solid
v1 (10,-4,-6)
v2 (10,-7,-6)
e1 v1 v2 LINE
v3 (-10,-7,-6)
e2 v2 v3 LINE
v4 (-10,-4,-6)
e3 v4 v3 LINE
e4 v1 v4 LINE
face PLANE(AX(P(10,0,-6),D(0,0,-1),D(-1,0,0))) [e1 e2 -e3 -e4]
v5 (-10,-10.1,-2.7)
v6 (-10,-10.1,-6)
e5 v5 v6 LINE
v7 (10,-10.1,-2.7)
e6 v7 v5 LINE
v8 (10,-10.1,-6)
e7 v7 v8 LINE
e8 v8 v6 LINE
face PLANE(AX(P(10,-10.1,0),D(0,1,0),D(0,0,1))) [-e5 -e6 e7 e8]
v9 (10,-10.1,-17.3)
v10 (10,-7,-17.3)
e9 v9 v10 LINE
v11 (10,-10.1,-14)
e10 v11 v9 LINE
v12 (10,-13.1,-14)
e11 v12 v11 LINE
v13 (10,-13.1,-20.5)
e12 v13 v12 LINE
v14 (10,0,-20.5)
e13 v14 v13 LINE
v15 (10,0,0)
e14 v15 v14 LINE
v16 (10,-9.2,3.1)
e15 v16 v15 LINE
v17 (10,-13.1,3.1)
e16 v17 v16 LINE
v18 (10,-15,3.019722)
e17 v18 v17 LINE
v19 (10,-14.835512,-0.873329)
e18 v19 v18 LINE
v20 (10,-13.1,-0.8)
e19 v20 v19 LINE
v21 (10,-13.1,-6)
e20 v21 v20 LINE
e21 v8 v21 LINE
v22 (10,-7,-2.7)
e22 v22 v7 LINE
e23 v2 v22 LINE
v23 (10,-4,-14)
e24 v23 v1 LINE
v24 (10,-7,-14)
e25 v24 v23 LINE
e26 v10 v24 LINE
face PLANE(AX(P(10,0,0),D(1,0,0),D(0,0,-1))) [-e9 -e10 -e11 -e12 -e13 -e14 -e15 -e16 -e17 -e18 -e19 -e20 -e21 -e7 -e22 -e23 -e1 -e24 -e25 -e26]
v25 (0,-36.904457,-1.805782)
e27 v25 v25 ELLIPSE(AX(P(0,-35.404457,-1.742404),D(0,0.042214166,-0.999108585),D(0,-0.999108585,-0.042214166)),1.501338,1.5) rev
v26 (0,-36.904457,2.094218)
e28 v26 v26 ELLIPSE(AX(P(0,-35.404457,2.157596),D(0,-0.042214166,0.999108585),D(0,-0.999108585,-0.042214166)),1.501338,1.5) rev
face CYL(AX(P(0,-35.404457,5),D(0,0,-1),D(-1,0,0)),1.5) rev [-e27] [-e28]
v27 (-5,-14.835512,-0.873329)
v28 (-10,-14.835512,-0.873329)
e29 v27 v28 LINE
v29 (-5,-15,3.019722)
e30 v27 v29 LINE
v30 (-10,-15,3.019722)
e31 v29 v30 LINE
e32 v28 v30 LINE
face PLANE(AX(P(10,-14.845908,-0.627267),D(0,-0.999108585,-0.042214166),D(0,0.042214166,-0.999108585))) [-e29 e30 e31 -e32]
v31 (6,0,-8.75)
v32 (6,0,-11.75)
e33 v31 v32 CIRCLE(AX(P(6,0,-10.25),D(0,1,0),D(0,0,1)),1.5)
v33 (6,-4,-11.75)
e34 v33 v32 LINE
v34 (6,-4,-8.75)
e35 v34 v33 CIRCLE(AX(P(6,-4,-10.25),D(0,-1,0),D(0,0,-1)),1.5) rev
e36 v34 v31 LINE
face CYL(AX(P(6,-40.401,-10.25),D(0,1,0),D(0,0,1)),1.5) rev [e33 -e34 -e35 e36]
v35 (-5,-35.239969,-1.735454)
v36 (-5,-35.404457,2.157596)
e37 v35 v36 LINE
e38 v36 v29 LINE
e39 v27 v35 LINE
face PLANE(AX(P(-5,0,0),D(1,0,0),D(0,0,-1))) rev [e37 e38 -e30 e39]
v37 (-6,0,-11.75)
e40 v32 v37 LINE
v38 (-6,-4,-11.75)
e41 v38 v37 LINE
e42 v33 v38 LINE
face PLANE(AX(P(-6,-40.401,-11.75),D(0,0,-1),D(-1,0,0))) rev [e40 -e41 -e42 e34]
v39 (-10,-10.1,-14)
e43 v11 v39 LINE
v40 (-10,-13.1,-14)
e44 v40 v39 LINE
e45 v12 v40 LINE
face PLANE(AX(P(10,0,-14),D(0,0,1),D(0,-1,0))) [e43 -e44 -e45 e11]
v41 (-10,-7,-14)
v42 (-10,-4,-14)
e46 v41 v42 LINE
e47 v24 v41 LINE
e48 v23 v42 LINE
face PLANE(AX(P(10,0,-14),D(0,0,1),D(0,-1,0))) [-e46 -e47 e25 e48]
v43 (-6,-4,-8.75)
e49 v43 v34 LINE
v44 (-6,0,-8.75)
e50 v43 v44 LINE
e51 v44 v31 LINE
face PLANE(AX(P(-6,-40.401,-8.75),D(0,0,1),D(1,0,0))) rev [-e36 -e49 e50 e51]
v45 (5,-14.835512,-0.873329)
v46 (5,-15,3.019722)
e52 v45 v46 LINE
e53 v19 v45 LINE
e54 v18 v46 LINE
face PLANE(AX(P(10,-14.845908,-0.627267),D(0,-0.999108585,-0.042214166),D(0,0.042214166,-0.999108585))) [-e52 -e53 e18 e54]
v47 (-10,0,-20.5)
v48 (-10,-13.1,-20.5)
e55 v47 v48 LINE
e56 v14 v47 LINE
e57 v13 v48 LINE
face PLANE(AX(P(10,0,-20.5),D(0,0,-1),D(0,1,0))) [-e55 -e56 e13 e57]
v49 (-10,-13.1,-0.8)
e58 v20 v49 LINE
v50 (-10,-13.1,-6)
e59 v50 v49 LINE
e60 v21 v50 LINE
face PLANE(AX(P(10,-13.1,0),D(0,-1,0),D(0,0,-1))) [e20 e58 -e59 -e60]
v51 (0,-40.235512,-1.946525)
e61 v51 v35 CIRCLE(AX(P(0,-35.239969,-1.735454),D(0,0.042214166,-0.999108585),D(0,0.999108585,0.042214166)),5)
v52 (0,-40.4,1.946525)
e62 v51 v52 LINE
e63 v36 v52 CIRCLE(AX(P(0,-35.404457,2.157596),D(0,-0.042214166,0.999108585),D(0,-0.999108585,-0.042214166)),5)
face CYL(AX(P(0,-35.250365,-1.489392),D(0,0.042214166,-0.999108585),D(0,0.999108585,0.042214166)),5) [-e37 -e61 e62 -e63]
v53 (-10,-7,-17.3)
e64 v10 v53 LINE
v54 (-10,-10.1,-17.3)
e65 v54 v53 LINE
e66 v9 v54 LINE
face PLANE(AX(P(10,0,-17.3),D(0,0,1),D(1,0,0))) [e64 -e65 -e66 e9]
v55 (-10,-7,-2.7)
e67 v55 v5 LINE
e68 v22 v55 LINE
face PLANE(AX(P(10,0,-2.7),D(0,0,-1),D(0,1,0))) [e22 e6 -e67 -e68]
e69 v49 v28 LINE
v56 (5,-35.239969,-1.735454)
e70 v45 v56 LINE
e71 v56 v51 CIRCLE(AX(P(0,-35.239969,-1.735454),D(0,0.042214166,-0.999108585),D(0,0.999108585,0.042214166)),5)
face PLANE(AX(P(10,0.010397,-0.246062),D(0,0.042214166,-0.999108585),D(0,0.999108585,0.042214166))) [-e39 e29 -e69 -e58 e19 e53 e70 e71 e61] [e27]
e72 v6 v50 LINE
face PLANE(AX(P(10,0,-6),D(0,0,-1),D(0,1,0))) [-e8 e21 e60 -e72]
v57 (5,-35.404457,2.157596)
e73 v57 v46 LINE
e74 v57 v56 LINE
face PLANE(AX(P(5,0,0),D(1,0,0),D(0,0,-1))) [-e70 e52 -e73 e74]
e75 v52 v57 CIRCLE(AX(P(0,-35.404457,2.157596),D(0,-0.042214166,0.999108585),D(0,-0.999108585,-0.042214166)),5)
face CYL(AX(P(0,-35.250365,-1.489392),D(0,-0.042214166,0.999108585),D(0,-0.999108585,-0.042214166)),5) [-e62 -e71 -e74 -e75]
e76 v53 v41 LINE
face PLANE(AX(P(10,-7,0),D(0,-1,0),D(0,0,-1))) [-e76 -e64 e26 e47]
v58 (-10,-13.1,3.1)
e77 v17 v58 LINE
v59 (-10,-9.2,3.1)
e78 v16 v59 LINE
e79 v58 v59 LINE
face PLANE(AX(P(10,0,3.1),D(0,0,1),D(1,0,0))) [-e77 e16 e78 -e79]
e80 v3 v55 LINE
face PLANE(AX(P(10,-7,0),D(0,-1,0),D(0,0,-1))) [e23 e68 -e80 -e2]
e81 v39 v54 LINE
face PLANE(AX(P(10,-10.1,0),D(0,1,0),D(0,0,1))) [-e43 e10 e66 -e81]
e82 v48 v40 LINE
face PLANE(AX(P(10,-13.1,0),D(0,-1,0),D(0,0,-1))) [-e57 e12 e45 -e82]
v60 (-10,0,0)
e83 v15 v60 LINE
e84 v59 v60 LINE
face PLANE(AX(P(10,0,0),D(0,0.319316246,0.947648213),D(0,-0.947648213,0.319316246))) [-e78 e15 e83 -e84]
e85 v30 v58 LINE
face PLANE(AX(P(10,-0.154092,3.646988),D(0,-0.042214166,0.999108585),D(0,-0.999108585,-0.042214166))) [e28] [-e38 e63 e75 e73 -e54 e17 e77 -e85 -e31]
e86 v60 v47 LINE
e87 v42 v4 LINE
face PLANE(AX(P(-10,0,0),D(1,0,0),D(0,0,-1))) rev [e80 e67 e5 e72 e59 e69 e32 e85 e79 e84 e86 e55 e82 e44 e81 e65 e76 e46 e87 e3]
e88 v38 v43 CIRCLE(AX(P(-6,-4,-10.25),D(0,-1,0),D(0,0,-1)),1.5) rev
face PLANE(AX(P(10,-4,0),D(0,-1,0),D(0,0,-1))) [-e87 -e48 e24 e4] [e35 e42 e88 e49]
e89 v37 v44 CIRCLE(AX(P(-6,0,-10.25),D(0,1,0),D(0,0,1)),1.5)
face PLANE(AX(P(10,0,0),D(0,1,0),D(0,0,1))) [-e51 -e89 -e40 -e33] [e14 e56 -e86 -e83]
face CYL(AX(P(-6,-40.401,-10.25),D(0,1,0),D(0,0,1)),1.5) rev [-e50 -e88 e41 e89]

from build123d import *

# Parameters (mm, degrees)
SALIENTE_EXTRUIR1_DEPTH = 10
SALIENTE_EXTRUIR2_DEPTH = 5
REDONDEO1_R             = 5
CORTAR_EXTRUIR2_REACH   = 48.394
CROQUIS4_R              = 1.5
CORTAR_EXTRUIR3_DEPTH   = 5


with BuildPart() as part:
    # Croquis1 → Saliente-Extruir1 (new, symmetric)
    with BuildSketch(Plane(origin=(0, 0, 0), x_dir=(0, 0, -1), z_dir=(1, 0, 0))):
        Polygon((20.5, 0), (0, 0), (-3.1, -9.2), (-3.1, -13.1), (-3.019721522, -15), (0.873328538, -14.835511509), (0.8, -13.1), (6, -13.1), (6, -10.1), (2.7, -10.1), (2.7, -7), (6, -7), (6, -4), (14, -4), (14, -7), (17.3, -7), (17.3, -10.1), (14, -10.1), (14, -13.1), (20.5, -13.1), align=None)
    extrude(amount=SALIENTE_EXTRUIR1_DEPTH, both=True)

    # Croquis1<4> → Saliente-Extruir2 (add, symmetric)
    with BuildSketch(Plane(origin=(0, 0, 0), x_dir=(0, 0, -1), z_dir=(1, 0, 0))):
        Polygon((0.873328538, -14.835511509), (-3.019721522, -15), (-1.94652503, -40.4), (1.94652503, -40.235511509), align=None)
    extrude(amount=SALIENTE_EXTRUIR2_DEPTH, both=True)

    # Redondeo1
    redondeo1_edges = [part.edges().sort_by_distance(p)[0] for p in [
        (-5, -40.317755755, 0),
        (5, -40.317755755, 0),
    ]]
    fillet(redondeo1_edges, radius=REDONDEO1_R - 0.0001)  # a hair under: the kernel refuses the full size

    # Croquis3 → Cortar-Extruir2 (cut, up to next)
    with BuildSketch(Plane(origin=(0, 0, 0), x_dir=(1, 0, 0), z_dir=(0, 1, 0)), mode=Mode.PRIVATE) as cortar_extruir2_sk1:
        with BuildLine():
            Line((-6, 11.75), (6, 11.75))
            ThreePointArc((6, 11.75), (7.5, 10.25), (6, 8.75))
            Line((6, 8.75), (-6, 8.75))
            ThreePointArc((-6, 8.75), (-7.5, 10.25), (-6, 11.75))
        make_face()
    cortar_extruir2_tool1 = extrude(cortar_extruir2_sk1.sketch, amount=-CORTAR_EXTRUIR2_REACH, mode=Mode.PRIVATE) & part.part
    add(cortar_extruir2_tool1.solids().sort_by_distance((0, 0, -10.25))[0], mode=Mode.SUBTRACT)

    # Croquis4 → Cortar-Extruir3 (cut, symmetric)
    with BuildSketch(Plane.XY):
        with Locations(Location((0, -35.404457076, 0), (0, 0, 270))):
            Circle(CROQUIS4_R)
    extrude(amount=CORTAR_EXTRUIR3_DEPTH, both=True, mode=Mode.SUBTRACT)


solid = part.part
